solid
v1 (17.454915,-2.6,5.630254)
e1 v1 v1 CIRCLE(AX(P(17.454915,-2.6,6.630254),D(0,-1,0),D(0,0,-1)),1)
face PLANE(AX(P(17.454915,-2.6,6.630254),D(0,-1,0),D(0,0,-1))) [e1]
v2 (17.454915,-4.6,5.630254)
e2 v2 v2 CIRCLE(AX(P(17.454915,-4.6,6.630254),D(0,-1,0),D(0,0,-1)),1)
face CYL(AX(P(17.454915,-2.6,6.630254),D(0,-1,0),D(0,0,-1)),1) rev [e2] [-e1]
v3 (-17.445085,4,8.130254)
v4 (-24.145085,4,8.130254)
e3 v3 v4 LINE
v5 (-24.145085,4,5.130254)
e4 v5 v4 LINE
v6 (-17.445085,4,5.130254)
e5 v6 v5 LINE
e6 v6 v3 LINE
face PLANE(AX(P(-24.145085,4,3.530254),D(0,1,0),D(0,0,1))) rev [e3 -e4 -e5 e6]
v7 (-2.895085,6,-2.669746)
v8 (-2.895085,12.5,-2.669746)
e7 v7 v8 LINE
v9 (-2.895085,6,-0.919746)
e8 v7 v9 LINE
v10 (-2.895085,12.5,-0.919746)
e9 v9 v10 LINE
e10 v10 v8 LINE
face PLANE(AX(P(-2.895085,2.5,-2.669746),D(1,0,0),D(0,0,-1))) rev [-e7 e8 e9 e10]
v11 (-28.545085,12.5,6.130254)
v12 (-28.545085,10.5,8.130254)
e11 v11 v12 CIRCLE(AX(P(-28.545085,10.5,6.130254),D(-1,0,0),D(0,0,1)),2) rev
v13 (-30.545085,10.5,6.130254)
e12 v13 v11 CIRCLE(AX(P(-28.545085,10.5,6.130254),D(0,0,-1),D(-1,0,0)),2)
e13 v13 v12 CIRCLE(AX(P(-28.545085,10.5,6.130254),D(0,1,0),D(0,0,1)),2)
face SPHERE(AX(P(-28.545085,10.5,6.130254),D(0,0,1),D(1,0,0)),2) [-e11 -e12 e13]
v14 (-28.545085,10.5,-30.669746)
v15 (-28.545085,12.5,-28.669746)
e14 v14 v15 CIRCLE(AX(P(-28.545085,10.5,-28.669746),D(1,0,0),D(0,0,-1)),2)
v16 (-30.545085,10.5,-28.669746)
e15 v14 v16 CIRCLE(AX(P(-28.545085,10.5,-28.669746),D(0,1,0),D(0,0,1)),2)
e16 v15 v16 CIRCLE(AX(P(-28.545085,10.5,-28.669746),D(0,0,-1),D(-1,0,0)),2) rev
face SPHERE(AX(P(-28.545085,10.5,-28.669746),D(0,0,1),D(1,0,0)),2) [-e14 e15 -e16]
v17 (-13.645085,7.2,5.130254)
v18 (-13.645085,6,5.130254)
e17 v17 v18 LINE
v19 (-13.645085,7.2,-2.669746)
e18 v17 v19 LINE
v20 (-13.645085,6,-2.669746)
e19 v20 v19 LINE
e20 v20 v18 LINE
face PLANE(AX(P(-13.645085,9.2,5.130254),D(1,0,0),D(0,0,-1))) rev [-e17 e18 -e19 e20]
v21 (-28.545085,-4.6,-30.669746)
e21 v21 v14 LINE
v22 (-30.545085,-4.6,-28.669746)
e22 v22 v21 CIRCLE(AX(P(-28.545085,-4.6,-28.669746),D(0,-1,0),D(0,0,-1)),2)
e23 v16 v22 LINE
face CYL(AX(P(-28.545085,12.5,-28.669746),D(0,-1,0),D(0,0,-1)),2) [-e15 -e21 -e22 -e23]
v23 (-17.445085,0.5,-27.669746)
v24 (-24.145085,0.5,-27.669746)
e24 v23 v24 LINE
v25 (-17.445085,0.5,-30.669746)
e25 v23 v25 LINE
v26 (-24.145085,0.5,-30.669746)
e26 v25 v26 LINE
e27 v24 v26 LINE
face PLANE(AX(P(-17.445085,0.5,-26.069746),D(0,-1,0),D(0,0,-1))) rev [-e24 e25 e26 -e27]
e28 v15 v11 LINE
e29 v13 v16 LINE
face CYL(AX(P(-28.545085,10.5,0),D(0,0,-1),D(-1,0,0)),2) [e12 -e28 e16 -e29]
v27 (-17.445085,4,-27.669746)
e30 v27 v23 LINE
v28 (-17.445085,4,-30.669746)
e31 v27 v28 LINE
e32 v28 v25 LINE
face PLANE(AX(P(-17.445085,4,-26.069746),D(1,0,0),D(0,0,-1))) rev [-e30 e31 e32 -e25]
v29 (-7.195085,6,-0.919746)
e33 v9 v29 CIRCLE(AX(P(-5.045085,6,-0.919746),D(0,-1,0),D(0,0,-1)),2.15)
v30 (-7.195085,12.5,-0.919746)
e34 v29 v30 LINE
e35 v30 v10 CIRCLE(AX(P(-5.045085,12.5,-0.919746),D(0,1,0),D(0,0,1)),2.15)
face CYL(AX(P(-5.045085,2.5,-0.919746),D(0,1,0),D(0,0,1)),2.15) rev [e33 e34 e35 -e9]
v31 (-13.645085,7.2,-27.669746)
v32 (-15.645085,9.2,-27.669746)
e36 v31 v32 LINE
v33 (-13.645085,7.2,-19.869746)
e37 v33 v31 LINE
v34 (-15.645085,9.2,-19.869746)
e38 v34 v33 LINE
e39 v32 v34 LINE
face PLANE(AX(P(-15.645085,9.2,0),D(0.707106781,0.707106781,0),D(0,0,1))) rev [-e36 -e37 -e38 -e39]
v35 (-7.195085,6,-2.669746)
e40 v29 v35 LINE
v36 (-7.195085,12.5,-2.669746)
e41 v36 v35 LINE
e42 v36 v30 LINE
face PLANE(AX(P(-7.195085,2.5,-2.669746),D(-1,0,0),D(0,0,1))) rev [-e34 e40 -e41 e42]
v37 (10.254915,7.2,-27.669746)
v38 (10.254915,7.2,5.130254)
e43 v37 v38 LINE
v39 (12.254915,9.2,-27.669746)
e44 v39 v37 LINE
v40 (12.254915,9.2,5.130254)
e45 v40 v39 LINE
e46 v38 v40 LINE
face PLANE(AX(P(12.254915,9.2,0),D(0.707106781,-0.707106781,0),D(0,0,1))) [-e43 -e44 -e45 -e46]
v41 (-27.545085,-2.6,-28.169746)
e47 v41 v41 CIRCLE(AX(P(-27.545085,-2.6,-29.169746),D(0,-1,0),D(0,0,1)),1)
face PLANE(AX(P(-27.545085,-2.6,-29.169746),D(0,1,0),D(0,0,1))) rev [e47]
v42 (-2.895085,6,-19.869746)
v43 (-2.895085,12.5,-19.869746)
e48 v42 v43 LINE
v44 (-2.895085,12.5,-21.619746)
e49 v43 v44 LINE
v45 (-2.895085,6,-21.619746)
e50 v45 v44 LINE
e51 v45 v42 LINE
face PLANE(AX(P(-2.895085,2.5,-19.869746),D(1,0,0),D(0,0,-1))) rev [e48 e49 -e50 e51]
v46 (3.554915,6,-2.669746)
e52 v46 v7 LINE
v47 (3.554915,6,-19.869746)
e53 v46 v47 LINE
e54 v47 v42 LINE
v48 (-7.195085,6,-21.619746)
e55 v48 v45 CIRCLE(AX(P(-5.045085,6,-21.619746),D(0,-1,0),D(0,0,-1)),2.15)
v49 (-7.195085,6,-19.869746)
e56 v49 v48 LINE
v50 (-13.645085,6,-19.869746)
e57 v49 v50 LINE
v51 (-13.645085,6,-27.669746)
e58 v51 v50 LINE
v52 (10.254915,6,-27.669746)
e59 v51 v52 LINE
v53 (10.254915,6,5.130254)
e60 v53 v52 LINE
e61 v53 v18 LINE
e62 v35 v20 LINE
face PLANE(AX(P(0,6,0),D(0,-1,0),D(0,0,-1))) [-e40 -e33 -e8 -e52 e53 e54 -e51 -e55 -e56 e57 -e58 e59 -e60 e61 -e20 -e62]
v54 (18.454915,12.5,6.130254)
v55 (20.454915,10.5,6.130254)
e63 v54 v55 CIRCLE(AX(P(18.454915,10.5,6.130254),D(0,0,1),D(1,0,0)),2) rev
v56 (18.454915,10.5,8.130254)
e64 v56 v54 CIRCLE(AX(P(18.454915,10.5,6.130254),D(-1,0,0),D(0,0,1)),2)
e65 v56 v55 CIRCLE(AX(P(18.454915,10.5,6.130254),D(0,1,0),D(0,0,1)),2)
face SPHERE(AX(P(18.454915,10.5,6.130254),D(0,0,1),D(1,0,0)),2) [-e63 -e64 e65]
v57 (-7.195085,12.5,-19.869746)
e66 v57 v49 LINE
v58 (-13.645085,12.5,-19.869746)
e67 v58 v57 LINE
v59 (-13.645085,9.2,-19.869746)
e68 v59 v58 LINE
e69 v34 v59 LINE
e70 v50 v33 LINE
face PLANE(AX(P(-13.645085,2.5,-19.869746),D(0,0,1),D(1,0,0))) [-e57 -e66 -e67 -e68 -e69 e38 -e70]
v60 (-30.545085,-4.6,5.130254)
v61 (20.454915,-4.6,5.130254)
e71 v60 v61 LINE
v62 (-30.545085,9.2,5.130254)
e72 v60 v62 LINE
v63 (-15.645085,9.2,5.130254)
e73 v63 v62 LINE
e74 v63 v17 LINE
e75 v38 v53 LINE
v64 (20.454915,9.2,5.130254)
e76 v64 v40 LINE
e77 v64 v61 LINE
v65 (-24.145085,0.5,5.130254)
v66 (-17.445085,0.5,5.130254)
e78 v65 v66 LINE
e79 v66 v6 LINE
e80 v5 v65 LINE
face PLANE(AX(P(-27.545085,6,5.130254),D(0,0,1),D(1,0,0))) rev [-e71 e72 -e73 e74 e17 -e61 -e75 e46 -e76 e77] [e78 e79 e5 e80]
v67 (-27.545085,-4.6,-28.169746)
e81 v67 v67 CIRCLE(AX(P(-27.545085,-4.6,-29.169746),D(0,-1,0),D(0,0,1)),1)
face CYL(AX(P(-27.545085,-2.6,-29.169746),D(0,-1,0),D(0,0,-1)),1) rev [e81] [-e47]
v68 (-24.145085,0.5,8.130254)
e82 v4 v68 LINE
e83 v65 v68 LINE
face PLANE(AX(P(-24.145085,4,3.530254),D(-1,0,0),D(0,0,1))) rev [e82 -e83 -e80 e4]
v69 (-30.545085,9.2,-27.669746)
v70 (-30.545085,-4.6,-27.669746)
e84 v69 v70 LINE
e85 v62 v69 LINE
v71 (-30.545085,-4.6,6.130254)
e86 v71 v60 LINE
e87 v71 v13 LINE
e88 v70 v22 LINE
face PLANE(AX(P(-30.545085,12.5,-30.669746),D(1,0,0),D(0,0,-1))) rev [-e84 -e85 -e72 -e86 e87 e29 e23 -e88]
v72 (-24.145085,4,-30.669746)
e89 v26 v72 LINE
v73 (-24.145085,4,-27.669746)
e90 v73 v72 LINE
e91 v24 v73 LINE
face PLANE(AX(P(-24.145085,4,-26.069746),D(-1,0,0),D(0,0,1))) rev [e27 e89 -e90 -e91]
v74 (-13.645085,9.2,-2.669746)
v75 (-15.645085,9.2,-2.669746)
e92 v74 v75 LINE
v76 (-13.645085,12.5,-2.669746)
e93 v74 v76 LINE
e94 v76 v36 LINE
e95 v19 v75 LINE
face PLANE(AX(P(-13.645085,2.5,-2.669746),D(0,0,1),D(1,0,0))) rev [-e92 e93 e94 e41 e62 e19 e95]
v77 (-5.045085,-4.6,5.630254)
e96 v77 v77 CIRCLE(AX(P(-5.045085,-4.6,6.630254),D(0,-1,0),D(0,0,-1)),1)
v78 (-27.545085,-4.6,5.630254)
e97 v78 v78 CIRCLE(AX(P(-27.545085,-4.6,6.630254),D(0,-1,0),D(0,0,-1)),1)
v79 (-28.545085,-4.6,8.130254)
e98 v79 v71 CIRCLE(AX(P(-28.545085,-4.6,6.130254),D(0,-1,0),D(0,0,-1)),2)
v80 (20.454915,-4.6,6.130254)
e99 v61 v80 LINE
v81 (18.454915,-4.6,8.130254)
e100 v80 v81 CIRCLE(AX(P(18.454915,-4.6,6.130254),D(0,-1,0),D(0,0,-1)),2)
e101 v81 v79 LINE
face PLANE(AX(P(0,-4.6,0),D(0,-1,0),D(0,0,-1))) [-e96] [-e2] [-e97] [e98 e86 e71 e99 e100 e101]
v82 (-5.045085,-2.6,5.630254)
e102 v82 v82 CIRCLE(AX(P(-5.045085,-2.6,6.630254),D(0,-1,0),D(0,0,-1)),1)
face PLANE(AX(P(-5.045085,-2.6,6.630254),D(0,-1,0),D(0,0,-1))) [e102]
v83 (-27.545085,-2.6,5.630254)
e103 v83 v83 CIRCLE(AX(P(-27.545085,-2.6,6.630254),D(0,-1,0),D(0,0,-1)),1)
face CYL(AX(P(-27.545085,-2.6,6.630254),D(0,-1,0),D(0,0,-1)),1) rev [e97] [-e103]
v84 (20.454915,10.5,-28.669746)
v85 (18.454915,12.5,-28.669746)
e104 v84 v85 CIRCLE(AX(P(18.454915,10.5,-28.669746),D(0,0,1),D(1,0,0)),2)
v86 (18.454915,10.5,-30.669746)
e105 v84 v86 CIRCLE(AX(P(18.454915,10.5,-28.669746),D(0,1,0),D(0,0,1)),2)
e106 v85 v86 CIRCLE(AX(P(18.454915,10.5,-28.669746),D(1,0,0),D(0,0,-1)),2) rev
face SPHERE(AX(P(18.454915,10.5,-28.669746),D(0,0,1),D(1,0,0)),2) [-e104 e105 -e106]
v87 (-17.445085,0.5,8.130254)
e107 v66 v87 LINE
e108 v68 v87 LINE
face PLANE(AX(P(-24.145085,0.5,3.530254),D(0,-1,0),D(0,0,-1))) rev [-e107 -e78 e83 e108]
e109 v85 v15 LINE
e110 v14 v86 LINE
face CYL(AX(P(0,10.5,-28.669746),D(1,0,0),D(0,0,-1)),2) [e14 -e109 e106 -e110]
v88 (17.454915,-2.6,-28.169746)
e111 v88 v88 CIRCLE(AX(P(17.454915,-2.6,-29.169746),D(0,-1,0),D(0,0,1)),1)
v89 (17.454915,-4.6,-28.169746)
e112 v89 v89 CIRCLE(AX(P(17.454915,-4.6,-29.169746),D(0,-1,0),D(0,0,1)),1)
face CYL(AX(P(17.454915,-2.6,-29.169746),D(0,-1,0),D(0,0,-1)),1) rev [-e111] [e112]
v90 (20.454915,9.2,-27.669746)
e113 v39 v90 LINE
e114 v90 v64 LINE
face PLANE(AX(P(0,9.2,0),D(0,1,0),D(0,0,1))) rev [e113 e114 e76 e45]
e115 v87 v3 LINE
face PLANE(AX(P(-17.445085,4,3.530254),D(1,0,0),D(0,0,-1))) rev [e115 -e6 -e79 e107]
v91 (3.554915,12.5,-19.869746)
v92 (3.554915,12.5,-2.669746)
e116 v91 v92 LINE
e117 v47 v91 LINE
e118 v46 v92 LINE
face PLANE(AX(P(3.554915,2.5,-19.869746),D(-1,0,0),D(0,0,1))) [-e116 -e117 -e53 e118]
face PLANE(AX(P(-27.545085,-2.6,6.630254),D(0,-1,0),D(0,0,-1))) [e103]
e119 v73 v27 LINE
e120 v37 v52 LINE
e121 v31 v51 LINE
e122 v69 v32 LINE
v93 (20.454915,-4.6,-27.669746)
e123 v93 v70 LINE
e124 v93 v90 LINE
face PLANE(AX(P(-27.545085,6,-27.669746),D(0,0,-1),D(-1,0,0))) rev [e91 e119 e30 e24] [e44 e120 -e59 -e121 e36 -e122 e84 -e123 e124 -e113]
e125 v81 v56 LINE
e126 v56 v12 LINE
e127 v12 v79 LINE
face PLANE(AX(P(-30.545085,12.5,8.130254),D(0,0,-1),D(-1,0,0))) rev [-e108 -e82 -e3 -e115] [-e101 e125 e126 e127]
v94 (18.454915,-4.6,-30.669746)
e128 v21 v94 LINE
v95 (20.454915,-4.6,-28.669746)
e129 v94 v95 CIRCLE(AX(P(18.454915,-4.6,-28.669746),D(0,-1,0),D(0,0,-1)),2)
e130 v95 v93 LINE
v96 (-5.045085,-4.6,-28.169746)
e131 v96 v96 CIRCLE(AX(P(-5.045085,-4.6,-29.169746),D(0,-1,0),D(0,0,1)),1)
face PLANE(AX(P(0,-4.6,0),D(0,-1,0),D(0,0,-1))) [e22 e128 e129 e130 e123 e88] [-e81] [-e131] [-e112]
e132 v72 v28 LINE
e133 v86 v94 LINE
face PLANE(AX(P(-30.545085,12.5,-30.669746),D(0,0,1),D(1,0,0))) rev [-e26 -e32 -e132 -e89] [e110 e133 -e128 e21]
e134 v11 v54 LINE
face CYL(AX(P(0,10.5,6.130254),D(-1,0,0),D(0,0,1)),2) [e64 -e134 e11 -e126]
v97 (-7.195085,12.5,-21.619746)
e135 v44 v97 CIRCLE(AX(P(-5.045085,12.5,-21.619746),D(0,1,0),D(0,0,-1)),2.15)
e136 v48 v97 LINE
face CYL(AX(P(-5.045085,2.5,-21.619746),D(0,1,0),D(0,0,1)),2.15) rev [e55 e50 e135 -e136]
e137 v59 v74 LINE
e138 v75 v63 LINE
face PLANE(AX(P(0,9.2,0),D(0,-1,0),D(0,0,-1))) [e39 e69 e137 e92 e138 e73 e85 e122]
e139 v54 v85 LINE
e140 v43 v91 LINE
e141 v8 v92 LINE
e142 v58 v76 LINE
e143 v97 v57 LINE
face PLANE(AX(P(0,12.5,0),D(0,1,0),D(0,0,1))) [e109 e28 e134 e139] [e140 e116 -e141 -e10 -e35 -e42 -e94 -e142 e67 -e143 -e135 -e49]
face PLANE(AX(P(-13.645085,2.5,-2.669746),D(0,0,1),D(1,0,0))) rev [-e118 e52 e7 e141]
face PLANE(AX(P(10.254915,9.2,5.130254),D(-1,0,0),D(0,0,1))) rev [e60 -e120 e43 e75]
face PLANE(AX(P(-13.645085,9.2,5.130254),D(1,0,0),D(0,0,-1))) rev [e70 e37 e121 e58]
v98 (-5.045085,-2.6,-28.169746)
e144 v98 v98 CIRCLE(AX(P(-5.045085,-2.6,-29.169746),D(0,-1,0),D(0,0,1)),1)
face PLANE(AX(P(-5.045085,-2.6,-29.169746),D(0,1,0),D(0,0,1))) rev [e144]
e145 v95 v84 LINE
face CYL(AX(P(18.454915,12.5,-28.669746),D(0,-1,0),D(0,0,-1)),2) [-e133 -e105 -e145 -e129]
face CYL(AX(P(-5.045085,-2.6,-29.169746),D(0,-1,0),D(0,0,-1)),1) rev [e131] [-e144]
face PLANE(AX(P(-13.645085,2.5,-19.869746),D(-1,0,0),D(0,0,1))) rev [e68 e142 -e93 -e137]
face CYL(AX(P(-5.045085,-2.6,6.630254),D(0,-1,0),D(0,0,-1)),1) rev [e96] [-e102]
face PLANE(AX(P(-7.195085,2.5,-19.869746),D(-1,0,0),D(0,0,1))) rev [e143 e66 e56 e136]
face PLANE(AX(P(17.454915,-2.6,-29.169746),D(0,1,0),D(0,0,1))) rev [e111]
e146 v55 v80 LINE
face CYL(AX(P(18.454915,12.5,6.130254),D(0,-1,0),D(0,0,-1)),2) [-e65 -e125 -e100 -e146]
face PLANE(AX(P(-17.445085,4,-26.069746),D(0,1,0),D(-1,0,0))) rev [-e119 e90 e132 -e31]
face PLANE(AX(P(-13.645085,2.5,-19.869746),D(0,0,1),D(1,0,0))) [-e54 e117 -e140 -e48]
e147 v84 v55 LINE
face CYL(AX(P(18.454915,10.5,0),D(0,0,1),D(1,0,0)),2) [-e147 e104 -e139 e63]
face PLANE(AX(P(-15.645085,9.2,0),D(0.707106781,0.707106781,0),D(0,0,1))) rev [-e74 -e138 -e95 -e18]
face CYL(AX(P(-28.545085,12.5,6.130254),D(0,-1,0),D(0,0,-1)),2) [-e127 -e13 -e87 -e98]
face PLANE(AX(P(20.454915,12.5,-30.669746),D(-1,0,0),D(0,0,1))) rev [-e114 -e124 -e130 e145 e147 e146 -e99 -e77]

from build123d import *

# Parameters (mm, degrees)
CROQUIS2_W              = 51
CROQUIS2_H              = 38.8
SALIENTE_EXTRUIR2_DEPTH = 12.5
CROQUIS8_W              = 45
CROQUIS8_H              = 32.8
CORTAR_EXTRUIR3_DEPTH   = 6
CROQUIS10_W             = 17.2
CROQUIS10_H             = 17.2
CORTAR_EXTRUIR4_DEPTH   = 10
CROQUIS12_W             = 7.2
CROQUIS12_H             = 32.8
CORTAR_EXTRUIR5_DEPTH   = 3.2
CROQUIS13_W             = 13.9
CROQUIS13_H             = 32.8
CORTAR_EXTRUIR6_DEPTH   = 3.2
CROQUIS14_W             = 32.8
CROQUIS14_H             = 9.2
CORTAR_EXTRUIR7_DEPTH   = 3.2
CROQUIS16_W             = 32.8
CROQUIS16_H             = 9.2
CORTAR_EXTRUIR8_DEPTH   = 3.2
CROQUIS17_W             = 51
CROQUIS17_H             = 3
SALIENTE_EXTRUIR3_DEPTH = 4.6
CROQUIS18_W             = 6.7
CROQUIS18_H             = 3.5
CORTAR_EXTRUIR9_DEPTH   = 4.6
CROQUIS19_W             = 6.7
CROQUIS19_H             = 3.5
CORTAR_EXTRUIR10_DEPTH  = 4.6
REDONDEO1_R             = 2
CROQUIS22_R             = 1
CORTAR_EXTRUIR11_DEPTH  = 2
REDONDEO2_R             = 2
CHAFL_N1_SIZE           = 2
CHAFL_N2_SIZE           = 2
CORTAR_EXTRUIR12_DEPTH  = 10


with BuildPart() as part:
    # Croquis2 → Saliente-Extruir2 (new body)
    with BuildSketch(Plane(origin=(0, 0, 0), x_dir=(1, 0, 0), z_dir=(0, 1, 0))):
        with Locations((-5.045084746, 11.269745763)):
            Rectangle(CROQUIS2_W, CROQUIS2_H)
    extrude(amount=SALIENTE_EXTRUIR2_DEPTH)

    # Croquis8 → Cortar-Extruir3 (cut)
    with BuildSketch(Plane.XZ):
        with Locations((-5.045084746, -11.269745763)):
            Rectangle(CROQUIS8_W, CROQUIS8_H)
    extrude(amount=-CORTAR_EXTRUIR3_DEPTH, mode=Mode.SUBTRACT)

    # Croquis10 → Cortar-Extruir4 (cut)
    with BuildSketch(Plane(origin=(0, 12.5, 0), x_dir=(1, 0, 0), z_dir=(0, 1, 0))):
        with Locations((-5.045084746, 11.269745763)):
            Rectangle(CROQUIS10_W, CROQUIS10_H)
    extrude(amount=-CORTAR_EXTRUIR4_DEPTH, mode=Mode.SUBTRACT)

    # Croquis12 → Cortar-Extruir5 (cut)
    with BuildSketch(Plane.XZ.offset(-6)):
        with Locations((13.854915254, -11.269745763)):
            Rectangle(CROQUIS12_W, CROQUIS12_H)
    extrude(amount=-CORTAR_EXTRUIR5_DEPTH, mode=Mode.SUBTRACT)

    # Croquis13 → Cortar-Extruir6 (cut)
    with BuildSketch(Plane.XZ.offset(-6)):
        with Locations((-20.595084746, -11.269745763)):
            Rectangle(CROQUIS13_W, CROQUIS13_H)
    extrude(amount=-CORTAR_EXTRUIR6_DEPTH, mode=Mode.SUBTRACT)

    # Croquis14 → Cortar-Extruir7 (cut)
    with BuildSketch(Plane(origin=(20.454915254, 0, 0), x_dir=(0, 0, -1), z_dir=(1, 0, 0))):
        with Locations((11.269745763, 4.6)):
            Rectangle(CROQUIS14_W, CROQUIS14_H)
    extrude(amount=-CORTAR_EXTRUIR7_DEPTH, mode=Mode.SUBTRACT)

    # Croquis16 → Cortar-Extruir8 (cut)
    with BuildSketch(Plane.ZY.offset(30.545084746)):
        with Locations((-11.269745763, 4.6)):
            Rectangle(CROQUIS16_W, CROQUIS16_H)
    extrude(amount=-CORTAR_EXTRUIR8_DEPTH, mode=Mode.SUBTRACT)

    # Croquis17 → Saliente-Extruir3 (add)
    with BuildSketch(Plane.XZ):
        with Locations((-5.045084746, 6.630254237)):
            Rectangle(CROQUIS17_W, CROQUIS17_H)
        with Locations((-5.045084746, -29.169745763)):
            Rectangle(CROQUIS17_W, CROQUIS17_H)
    extrude(amount=SALIENTE_EXTRUIR3_DEPTH)

    # Croquis18 → Cortar-Extruir9 (cut)
    with BuildSketch(Plane.XY.offset(8.130254237)):
        with Locations((-20.795084746, 2.25)):
            Rectangle(CROQUIS18_W, CROQUIS18_H)
    extrude(amount=-CORTAR_EXTRUIR9_DEPTH, mode=Mode.SUBTRACT)

    # Croquis19 → Cortar-Extruir10 (cut)
    with BuildSketch(Plane(origin=(0, 0, -30.669745763), x_dir=(-1, 0, 0), z_dir=(0, 0, -1))):
        with Locations((20.795084746, 2.25)):
            Rectangle(CROQUIS19_W, CROQUIS19_H)
    extrude(amount=-CORTAR_EXTRUIR10_DEPTH, mode=Mode.SUBTRACT)

    # Redondeo1
    redondeo1_edges = [part.edges().sort_by_distance(p)[0] for p in [
        (20.454915254, 12.5, -11.269745763),
        (-5.045084746, 12.5, -30.669745763),
        (-30.545084746, 12.5, -11.269745763),
        (-5.045084746, 12.5, 8.130254237),
    ]]
    fillet(redondeo1_edges, radius=REDONDEO1_R)

    # Croquis22 → Cortar-Extruir11 (cut)
    with BuildSketch(Plane.XZ.offset(4.6)):
        with Locations(Location((-27.545084746, 6.630254237, 0), (0, 0, 270))):
            Circle(CROQUIS22_R)
        with Locations(Location((-5.045084746, 6.630254237, 0), (0, 0, 270))):
            Circle(CROQUIS22_R)
        with Locations(Location((17.454915254, 6.630254237, 0), (0, 0, 270))):
            Circle(CROQUIS22_R)
        with Locations(Location((17.454915254, -29.169745763, 0), (0, 0, 90))):
            Circle(CROQUIS22_R)
        with Locations(Location((-5.045084746, -29.169745763, 0), (0, 0, 90))):
            Circle(CROQUIS22_R)
        with Locations(Location((-27.545084746, -29.169745763, 0), (0, 0, 90))):
            Circle(CROQUIS22_R)
    extrude(amount=-CORTAR_EXTRUIR11_DEPTH, mode=Mode.SUBTRACT)

    # Redondeo2
    # the kernel refuses this fillet: 2 mm, written as the material it takes off along each edge
    with BuildSketch(Plane(origin=(18.454915254, 10.5, -28.669745763), x_dir=(1, 0, 0), z_dir=(0, 0, -1))) as redondeo2_piece_1_section:
        Polygon((0, 0), (REDONDEO2_R, 0), (REDONDEO2_R, -REDONDEO2_R), (0, -REDONDEO2_R), align=None)
    redondeo2_piece_1 = extrude(amount=REDONDEO2_R, mode=Mode.PRIVATE)
    redondeo2_piece_1 = redondeo2_piece_1 - Plane(origin=(18.454915254, 10.5, -28.669745763), x_dir=(-0.7071067811865475, -0.7071067811865475, 0), z_dir=(0, 0, -1)) * Sphere(REDONDEO2_R, mode=Mode.PRIVATE)
    add(redondeo2_piece_1, mode=Mode.SUBTRACT)
    with BuildSketch(Plane(origin=(18.454915254, 10.5, 6.130254237), x_dir=(0, 0, 1), z_dir=(1, 0, 0))) as redondeo2_piece_2_section:
        Polygon((0, 0), (REDONDEO2_R, 0), (REDONDEO2_R, -REDONDEO2_R), (0, -REDONDEO2_R), align=None)
    redondeo2_piece_2 = extrude(amount=REDONDEO2_R, mode=Mode.PRIVATE)
    redondeo2_piece_2 = redondeo2_piece_2 - Plane(origin=(18.454915254, 10.5, 6.130254237), x_dir=(0, -0.7071067811865475, -0.7071067811865475), z_dir=(1, 0, 0)) * Sphere(REDONDEO2_R, mode=Mode.PRIVATE)
    add(redondeo2_piece_2, mode=Mode.SUBTRACT)
    with BuildSketch(Plane(origin=(-28.545084746, 10.5, -28.669745763), x_dir=(-1, 0, 0), z_dir=(0, 0, -1))) as redondeo2_piece_3_section:
        Polygon((0, 0), (REDONDEO2_R, 0), (REDONDEO2_R, REDONDEO2_R), (0, REDONDEO2_R), align=None)
    redondeo2_piece_3 = extrude(amount=REDONDEO2_R, mode=Mode.PRIVATE)
    redondeo2_piece_3 = redondeo2_piece_3 - Plane(origin=(-28.545084746, 10.5, -28.669745763), x_dir=(0.7071067811865475, -0.7071067811865475, 0), z_dir=(0, 0, -1)) * Sphere(REDONDEO2_R, mode=Mode.PRIVATE)
    add(redondeo2_piece_3, mode=Mode.SUBTRACT)
    with BuildSketch(Plane(origin=(-28.545084746, 10.5, 6.130254237), x_dir=(0, 0, 1), z_dir=(-1, 0, 0))) as redondeo2_piece_4_section:
        Polygon((0, 0), (REDONDEO2_R, 0), (REDONDEO2_R, REDONDEO2_R), (0, REDONDEO2_R), align=None)
    redondeo2_piece_4 = extrude(amount=REDONDEO2_R, mode=Mode.PRIVATE)
    redondeo2_piece_4 = redondeo2_piece_4 - Plane(origin=(-28.545084746, 10.5, 6.130254237), x_dir=(0, -0.7071067811865475, -0.7071067811865475), z_dir=(-1, 0, 0)) * Sphere(REDONDEO2_R, mode=Mode.PRIVATE)
    add(redondeo2_piece_4, mode=Mode.SUBTRACT)
    with BuildSketch(Plane(origin=(-30.545084746, -9.6, -30.669745763), x_dir=(1, 0, 0), z_dir=(0, 1, 0)), Plane(origin=(-30.545084746, -9.6, 8.130254237), x_dir=(0, 0, -1), z_dir=(0, 1, 0)), Plane(origin=(20.454915254, 10.5, 8.130254237), x_dir=(0, 0, -1), z_dir=(0, -1, 0)), Plane(origin=(20.454915254, 10.5, -30.669745763), x_dir=(-1, 0, 0), z_dir=(0, -1, 0))) as redondeo2_piece_5:
        with BuildLine():
            CenterArc((REDONDEO2_R, -REDONDEO2_R), REDONDEO2_R, 90, 90)
            Line((0, -REDONDEO2_R), (0, 0))
            Line((0, 0), (REDONDEO2_R, 0))
        make_face()
    extrude(amount=20.1, mode=Mode.SUBTRACT)

    # Chaflán1
    chafl_n1_edges = [part.edges().sort_by_distance(p)[0] for p in [
        (-13.645084746, 9.2, 1.230254237),
        (-13.645084746, 9.2, -23.769745763),
    ]]
    chamfer(chafl_n1_edges, length=CHAFL_N1_SIZE)

    # Chaflán2
    chafl_n2_edges = [part.edges().sort_by_distance(p)[0] for p in [
        (10.254915254, 9.2, -11.269745763),
    ]]
    chamfer(chafl_n2_edges, length=CHAFL_N2_SIZE)

    # Croquis27 → Cortar-Extruir12 (cut)
    with BuildSketch(Plane(origin=(0, 12.5, 0), x_dir=(1, 0, 0), z_dir=(0, 1, 0))):
        with BuildLine():
            Line((-7.195084746, 2.669745763), (-2.895084746, 2.669745763))
            Line((-2.895084746, 2.669745763), (-2.895084746, 0.919745763))
            ThreePointArc((-2.895084746, 0.919745763), (-5.045084746, -1.230254237), (-7.195084746, 0.919745763))
            Line((-7.195084746, 0.919745763), (-7.195084746, 2.669745763))
        make_face()
        with BuildLine():
            Line((-7.195084746, 19.869745763), (-2.895084746, 19.869745763))
            Line((-2.895084746, 19.869745763), (-2.895084746, 21.619745763))
            ThreePointArc((-2.895084746, 21.619745763), (-5.045084746, 23.769745763), (-7.195084746, 21.619745763))
            Line((-7.195084746, 21.619745763), (-7.195084746, 19.869745763))
        make_face()
    extrude(amount=-CORTAR_EXTRUIR12_DEPTH, mode=Mode.SUBTRACT)


solid = part.part
